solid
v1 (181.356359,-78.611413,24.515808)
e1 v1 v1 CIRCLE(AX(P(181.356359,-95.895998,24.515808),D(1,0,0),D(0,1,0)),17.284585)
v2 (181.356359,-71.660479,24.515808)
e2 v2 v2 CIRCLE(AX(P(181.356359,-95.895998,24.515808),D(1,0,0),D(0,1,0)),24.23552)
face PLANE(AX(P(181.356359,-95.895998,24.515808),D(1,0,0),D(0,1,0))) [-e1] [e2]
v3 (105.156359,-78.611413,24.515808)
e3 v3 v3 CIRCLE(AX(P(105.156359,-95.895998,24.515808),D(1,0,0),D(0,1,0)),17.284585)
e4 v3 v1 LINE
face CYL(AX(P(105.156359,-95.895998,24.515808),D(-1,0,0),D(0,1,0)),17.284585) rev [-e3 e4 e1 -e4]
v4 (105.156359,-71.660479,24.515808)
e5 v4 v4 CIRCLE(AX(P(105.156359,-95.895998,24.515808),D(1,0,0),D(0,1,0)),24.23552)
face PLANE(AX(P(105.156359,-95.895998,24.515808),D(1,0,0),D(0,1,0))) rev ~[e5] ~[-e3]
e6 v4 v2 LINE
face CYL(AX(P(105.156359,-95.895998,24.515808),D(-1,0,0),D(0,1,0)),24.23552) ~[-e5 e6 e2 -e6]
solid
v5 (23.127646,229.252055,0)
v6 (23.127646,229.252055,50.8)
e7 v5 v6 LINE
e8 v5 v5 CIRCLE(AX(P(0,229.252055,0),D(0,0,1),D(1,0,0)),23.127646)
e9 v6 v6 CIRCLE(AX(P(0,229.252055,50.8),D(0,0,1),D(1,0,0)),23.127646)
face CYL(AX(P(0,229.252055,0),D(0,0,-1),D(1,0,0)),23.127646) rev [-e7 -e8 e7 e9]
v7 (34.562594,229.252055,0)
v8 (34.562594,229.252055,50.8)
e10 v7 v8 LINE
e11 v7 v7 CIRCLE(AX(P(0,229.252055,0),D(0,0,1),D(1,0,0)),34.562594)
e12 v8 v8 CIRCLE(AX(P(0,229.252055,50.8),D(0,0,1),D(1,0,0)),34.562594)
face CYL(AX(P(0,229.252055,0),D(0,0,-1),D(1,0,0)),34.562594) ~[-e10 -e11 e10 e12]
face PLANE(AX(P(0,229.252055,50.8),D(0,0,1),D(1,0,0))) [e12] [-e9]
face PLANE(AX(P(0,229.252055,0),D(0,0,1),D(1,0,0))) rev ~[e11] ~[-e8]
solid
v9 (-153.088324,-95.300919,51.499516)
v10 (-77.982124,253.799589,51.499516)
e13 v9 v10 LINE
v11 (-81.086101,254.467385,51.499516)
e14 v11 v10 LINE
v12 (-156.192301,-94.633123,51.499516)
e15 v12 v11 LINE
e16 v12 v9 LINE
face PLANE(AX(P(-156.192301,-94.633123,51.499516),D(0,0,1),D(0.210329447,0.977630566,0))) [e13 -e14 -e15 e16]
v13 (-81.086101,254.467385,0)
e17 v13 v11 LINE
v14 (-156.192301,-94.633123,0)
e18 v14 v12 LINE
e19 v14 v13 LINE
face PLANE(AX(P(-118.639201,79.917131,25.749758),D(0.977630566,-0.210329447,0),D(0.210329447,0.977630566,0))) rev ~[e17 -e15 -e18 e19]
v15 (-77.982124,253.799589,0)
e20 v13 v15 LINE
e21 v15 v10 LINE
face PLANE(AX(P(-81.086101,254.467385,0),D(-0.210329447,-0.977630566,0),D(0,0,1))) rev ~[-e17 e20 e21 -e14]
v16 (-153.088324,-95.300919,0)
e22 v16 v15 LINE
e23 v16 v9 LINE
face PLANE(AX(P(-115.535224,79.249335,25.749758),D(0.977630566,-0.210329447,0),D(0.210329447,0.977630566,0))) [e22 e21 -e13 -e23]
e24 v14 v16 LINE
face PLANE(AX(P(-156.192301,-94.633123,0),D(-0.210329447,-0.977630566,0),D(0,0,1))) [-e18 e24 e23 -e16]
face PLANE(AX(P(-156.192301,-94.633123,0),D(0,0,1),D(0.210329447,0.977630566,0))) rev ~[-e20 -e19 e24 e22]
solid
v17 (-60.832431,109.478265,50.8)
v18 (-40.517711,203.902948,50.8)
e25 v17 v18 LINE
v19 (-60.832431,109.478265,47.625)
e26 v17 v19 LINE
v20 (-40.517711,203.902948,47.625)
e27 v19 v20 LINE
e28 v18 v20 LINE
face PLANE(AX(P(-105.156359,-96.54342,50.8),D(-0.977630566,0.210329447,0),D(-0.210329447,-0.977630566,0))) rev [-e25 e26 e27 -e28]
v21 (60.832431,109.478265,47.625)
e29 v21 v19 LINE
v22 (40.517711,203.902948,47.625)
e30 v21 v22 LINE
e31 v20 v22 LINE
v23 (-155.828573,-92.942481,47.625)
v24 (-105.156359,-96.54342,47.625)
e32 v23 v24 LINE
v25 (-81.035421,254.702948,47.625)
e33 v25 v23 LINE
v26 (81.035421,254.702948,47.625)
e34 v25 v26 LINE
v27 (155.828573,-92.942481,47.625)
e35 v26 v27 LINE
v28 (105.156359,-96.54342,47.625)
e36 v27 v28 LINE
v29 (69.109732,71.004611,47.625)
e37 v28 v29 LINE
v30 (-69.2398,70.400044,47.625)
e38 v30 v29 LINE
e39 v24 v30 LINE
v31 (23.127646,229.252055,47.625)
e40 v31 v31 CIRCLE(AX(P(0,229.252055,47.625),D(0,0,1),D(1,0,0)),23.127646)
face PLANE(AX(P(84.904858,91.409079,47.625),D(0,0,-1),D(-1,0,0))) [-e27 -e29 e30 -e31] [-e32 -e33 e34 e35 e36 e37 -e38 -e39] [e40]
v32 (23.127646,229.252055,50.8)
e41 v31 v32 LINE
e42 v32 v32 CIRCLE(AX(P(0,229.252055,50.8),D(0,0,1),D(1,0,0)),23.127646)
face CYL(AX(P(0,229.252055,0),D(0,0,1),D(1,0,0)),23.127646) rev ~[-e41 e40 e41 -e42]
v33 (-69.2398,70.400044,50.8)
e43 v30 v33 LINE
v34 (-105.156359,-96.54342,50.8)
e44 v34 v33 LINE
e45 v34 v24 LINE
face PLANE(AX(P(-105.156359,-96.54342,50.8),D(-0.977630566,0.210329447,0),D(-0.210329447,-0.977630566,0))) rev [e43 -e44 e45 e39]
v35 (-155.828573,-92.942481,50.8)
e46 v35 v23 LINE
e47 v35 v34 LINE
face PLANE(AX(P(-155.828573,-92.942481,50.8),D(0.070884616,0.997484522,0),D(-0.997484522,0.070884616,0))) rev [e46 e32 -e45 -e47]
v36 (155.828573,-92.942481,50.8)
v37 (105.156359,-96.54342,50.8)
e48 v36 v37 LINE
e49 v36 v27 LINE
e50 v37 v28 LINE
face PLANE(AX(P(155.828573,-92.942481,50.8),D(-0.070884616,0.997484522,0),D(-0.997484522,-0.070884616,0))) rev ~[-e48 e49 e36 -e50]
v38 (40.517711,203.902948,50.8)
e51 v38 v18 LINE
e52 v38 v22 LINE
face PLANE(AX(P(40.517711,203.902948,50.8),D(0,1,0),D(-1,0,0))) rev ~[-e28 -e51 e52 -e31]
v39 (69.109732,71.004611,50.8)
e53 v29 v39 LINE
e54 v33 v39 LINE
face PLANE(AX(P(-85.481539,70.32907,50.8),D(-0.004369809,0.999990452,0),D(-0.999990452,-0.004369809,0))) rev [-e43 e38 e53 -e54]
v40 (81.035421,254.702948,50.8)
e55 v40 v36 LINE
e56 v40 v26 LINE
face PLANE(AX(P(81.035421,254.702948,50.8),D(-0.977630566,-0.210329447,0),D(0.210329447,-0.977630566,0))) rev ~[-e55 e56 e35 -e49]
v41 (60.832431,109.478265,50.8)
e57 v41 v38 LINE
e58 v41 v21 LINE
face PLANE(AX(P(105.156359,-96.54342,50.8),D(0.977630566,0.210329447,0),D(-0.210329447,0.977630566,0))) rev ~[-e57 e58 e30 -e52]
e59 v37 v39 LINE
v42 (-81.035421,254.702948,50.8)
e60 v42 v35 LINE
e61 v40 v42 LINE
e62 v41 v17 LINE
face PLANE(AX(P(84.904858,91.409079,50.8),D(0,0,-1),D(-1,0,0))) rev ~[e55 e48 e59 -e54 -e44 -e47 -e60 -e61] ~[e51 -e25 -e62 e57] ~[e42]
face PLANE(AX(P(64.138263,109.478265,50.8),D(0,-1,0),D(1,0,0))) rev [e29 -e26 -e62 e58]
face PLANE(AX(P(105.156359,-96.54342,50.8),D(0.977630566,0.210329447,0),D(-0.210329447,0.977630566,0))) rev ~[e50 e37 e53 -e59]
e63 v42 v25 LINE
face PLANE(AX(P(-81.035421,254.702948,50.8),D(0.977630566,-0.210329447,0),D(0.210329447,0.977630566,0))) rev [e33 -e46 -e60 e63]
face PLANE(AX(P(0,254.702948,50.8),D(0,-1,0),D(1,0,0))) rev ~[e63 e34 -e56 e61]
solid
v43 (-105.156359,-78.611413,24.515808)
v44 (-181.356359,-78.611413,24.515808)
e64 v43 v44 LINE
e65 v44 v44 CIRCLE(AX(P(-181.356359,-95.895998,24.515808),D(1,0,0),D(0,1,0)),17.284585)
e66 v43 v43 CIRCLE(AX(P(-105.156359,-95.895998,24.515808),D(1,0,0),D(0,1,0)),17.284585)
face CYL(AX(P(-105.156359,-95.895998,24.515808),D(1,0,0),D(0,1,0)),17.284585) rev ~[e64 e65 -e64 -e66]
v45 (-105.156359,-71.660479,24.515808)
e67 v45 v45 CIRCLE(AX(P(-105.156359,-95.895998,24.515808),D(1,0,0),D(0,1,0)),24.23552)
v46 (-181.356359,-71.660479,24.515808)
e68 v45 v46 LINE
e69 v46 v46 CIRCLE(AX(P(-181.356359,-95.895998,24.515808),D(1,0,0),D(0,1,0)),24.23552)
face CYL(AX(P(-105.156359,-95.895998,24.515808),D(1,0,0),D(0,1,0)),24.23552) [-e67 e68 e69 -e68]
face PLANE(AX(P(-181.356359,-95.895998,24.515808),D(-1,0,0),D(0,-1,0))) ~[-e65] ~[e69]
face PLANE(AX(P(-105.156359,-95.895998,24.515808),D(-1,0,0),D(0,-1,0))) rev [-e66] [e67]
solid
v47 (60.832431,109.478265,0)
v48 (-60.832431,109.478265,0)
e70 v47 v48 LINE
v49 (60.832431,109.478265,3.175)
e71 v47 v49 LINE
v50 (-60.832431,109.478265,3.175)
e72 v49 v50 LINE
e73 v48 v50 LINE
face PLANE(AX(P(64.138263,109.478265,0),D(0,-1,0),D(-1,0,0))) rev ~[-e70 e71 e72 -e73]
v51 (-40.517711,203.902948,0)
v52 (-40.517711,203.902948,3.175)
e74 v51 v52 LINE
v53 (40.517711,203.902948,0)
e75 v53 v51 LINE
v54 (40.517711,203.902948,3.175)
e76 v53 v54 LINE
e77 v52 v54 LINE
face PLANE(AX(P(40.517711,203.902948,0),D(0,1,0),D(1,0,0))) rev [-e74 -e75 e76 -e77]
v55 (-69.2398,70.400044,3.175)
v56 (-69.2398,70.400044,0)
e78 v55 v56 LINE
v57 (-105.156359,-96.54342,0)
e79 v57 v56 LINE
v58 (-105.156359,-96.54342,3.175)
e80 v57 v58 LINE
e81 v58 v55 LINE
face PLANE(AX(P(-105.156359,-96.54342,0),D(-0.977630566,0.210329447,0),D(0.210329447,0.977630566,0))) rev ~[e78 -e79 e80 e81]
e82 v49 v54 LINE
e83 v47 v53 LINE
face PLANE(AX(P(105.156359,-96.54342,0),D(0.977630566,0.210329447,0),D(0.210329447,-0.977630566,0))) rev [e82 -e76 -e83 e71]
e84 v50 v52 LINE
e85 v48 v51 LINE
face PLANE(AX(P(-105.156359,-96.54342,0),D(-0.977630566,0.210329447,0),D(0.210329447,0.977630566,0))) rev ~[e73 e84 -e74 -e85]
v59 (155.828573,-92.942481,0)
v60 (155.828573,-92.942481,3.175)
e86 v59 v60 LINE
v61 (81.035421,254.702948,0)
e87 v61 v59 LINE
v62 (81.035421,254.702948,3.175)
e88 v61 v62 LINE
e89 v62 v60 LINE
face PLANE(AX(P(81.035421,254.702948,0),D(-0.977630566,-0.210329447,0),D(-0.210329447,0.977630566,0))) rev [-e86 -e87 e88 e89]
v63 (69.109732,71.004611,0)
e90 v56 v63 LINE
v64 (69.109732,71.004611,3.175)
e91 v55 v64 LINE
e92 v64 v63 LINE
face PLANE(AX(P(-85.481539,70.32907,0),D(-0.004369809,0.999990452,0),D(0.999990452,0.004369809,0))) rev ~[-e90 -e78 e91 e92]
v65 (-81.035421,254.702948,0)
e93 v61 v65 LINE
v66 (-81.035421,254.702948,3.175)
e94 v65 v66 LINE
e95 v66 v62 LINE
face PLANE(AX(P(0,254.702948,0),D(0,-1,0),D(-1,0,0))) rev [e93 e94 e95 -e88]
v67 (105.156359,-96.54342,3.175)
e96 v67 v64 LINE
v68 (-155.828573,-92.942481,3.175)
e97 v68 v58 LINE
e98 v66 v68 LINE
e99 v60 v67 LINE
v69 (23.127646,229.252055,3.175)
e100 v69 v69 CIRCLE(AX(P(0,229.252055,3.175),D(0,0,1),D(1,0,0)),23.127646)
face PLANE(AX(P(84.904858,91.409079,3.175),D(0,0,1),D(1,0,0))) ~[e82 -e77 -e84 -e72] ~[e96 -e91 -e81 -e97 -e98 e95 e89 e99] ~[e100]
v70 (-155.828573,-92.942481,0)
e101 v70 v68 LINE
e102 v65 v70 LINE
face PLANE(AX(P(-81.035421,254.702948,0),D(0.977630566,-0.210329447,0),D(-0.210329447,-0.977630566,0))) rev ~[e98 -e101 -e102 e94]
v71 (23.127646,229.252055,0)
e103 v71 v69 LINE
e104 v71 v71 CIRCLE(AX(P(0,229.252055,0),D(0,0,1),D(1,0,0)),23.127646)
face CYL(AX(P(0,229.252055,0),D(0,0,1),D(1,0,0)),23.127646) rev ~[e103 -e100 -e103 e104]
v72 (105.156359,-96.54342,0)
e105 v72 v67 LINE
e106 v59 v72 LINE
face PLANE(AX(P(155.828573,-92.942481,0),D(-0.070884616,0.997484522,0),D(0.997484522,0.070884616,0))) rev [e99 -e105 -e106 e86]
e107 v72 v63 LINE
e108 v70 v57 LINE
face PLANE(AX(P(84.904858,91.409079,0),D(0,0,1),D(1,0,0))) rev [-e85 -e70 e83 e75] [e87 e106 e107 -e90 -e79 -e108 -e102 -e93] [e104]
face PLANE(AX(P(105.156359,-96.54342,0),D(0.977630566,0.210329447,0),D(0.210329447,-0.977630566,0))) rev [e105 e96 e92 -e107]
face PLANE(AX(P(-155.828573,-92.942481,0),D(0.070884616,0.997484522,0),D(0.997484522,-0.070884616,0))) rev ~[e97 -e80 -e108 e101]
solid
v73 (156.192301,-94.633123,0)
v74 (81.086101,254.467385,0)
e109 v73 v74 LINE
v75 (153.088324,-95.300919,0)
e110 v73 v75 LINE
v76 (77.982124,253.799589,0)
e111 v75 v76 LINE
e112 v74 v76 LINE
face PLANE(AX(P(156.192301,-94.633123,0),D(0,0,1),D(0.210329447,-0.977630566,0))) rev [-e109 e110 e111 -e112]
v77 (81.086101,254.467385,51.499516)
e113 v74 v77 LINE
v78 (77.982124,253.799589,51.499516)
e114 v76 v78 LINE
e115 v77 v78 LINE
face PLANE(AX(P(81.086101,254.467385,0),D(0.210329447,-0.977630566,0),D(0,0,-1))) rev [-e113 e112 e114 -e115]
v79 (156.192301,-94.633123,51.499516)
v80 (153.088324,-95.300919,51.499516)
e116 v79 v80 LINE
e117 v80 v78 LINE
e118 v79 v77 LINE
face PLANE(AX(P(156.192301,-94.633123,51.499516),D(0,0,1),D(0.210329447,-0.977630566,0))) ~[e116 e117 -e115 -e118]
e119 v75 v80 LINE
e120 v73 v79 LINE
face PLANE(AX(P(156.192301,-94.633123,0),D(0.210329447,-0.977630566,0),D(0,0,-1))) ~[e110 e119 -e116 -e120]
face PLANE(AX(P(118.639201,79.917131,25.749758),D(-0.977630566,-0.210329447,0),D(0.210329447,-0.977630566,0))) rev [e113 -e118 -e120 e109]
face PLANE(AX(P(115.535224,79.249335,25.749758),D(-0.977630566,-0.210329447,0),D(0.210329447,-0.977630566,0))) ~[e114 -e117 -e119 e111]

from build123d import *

# Parameters (mm, degrees)
F1_DEPTH  = 3.175
F3_DEPTH  = 3.175
F7_W      = 357.0883721113
F7_H      = 51.4995157719
F8_DEPTH  = 3.175
F10_R     = 24.2355196554
F10_R_2   = 17.2845850153
F19_DEPTH = 76.2
F20_R     = 34.5625940256
F20_R_2   = 23.1276455752
F12_DEPTH = 50.8
F21_DEPTH = 63.5


# Not quite as in the source:
# - a feature of the source that left no trace in its solid (it failed there, or was rolled back) is left out
# - a feature names something its author has since deleted; it is built from what else it names


with BuildPart() as f1:
    # F0 (on face) → F1 (new body)
    with BuildSketch(Plane.XY):
        Polygon((0, 254.7029479625), (-81.0354214167, 254.7029479625), (-155.8285728535, -92.9424813159), (-105.1563591477, -96.5434198266), (-40.5177107084, 203.9029479625), (0, 203.9029479625), align=None)
    extrude(amount=F1_DEPTH)

    # F2: F1 across plane


with BuildPart() as f1_1:
    add(f1.part)
    add(f1.part.mirror(Plane.YZ))

    # F17 (on Top) → F3 (join)
    with BuildSketch(Plane.XY):
        Polygon((64.138263464, 109.4782650471), (-71.3108032942, 109.4782650471), (-85.4815393686, 70.3290700912), (86.3957703114, 71.0801482201), align=None)
    extrude(amount=F3_DEPTH)


with BuildPart() as f5_1:
    # F5: instance of F1
    add(f1_1.part.mirror(Plane.XY.offset(25.4)))


with BuildPart() as f8:
    # F7 (on 3pt) → F8 (new body)
    with BuildSketch(Plane(origin=(-129.823703286, 27.9305380776, 0), x_dir=(0.2103294472, 0.977630566, 0), z_dir=(0.977630566, -0.2103294472, 0))):
        with Locations((53.176112473, 25.7497578859)):
            Rectangle(F7_W, F7_H)
    extrude(amount=F8_DEPTH)


with BuildPart() as f18_1:
    # F18: instance of F8
    add(f8.part.mirror(Plane.YZ))


with BuildPart() as f19:
    # F10 (on plane+point) → F19 (new body)
    with BuildSketch(Plane.YZ.offset(105.1563591477)):
        with Locations((-95.8959981799, 24.5158076286)):
            Circle(F10_R)
        with Locations((-95.8959981799, 24.5158076286)):
            Circle(F10_R_2, mode=Mode.SUBTRACT)
    extrude(amount=F19_DEPTH)


with BuildPart() as f11_1:
    # F11: instance of F19
    add(f19.part.mirror(Plane.YZ))


with BuildPart() as f12:
    # F20 (on Top) → F12 (new body)
    with BuildSketch(Plane.XY):
        with Locations((0, 229.2520552874)):
            Circle(F20_R)
        with Locations((0, 229.2520552874)):
            Circle(F20_R_2, mode=Mode.SUBTRACT)
    extrude(amount=F12_DEPTH)


with BuildPart() as f21_tool:
    # F20 (on Top) → F21 (new body, symmetric)
    with BuildSketch(Plane.XY):
        with Locations((0, 229.2520552874)):
            Circle(F20_R_2)
    extrude(amount=F21_DEPTH, both=True)


with BuildPart() as f1_2:
    add(f1_1.part)

    # F21: cut by f21_tool
    add(f21_tool.part, mode=Mode.SUBTRACT)


with BuildPart() as f5_1_1:
    add(f5_1.part)

    # F21: cut by f21_tool
    add(f21_tool.part, mode=Mode.SUBTRACT)


solid = Compound([f8.part, f18_1.part, f19.part, f11_1.part, f12.part, f1_2.part, f5_1_1.part])
